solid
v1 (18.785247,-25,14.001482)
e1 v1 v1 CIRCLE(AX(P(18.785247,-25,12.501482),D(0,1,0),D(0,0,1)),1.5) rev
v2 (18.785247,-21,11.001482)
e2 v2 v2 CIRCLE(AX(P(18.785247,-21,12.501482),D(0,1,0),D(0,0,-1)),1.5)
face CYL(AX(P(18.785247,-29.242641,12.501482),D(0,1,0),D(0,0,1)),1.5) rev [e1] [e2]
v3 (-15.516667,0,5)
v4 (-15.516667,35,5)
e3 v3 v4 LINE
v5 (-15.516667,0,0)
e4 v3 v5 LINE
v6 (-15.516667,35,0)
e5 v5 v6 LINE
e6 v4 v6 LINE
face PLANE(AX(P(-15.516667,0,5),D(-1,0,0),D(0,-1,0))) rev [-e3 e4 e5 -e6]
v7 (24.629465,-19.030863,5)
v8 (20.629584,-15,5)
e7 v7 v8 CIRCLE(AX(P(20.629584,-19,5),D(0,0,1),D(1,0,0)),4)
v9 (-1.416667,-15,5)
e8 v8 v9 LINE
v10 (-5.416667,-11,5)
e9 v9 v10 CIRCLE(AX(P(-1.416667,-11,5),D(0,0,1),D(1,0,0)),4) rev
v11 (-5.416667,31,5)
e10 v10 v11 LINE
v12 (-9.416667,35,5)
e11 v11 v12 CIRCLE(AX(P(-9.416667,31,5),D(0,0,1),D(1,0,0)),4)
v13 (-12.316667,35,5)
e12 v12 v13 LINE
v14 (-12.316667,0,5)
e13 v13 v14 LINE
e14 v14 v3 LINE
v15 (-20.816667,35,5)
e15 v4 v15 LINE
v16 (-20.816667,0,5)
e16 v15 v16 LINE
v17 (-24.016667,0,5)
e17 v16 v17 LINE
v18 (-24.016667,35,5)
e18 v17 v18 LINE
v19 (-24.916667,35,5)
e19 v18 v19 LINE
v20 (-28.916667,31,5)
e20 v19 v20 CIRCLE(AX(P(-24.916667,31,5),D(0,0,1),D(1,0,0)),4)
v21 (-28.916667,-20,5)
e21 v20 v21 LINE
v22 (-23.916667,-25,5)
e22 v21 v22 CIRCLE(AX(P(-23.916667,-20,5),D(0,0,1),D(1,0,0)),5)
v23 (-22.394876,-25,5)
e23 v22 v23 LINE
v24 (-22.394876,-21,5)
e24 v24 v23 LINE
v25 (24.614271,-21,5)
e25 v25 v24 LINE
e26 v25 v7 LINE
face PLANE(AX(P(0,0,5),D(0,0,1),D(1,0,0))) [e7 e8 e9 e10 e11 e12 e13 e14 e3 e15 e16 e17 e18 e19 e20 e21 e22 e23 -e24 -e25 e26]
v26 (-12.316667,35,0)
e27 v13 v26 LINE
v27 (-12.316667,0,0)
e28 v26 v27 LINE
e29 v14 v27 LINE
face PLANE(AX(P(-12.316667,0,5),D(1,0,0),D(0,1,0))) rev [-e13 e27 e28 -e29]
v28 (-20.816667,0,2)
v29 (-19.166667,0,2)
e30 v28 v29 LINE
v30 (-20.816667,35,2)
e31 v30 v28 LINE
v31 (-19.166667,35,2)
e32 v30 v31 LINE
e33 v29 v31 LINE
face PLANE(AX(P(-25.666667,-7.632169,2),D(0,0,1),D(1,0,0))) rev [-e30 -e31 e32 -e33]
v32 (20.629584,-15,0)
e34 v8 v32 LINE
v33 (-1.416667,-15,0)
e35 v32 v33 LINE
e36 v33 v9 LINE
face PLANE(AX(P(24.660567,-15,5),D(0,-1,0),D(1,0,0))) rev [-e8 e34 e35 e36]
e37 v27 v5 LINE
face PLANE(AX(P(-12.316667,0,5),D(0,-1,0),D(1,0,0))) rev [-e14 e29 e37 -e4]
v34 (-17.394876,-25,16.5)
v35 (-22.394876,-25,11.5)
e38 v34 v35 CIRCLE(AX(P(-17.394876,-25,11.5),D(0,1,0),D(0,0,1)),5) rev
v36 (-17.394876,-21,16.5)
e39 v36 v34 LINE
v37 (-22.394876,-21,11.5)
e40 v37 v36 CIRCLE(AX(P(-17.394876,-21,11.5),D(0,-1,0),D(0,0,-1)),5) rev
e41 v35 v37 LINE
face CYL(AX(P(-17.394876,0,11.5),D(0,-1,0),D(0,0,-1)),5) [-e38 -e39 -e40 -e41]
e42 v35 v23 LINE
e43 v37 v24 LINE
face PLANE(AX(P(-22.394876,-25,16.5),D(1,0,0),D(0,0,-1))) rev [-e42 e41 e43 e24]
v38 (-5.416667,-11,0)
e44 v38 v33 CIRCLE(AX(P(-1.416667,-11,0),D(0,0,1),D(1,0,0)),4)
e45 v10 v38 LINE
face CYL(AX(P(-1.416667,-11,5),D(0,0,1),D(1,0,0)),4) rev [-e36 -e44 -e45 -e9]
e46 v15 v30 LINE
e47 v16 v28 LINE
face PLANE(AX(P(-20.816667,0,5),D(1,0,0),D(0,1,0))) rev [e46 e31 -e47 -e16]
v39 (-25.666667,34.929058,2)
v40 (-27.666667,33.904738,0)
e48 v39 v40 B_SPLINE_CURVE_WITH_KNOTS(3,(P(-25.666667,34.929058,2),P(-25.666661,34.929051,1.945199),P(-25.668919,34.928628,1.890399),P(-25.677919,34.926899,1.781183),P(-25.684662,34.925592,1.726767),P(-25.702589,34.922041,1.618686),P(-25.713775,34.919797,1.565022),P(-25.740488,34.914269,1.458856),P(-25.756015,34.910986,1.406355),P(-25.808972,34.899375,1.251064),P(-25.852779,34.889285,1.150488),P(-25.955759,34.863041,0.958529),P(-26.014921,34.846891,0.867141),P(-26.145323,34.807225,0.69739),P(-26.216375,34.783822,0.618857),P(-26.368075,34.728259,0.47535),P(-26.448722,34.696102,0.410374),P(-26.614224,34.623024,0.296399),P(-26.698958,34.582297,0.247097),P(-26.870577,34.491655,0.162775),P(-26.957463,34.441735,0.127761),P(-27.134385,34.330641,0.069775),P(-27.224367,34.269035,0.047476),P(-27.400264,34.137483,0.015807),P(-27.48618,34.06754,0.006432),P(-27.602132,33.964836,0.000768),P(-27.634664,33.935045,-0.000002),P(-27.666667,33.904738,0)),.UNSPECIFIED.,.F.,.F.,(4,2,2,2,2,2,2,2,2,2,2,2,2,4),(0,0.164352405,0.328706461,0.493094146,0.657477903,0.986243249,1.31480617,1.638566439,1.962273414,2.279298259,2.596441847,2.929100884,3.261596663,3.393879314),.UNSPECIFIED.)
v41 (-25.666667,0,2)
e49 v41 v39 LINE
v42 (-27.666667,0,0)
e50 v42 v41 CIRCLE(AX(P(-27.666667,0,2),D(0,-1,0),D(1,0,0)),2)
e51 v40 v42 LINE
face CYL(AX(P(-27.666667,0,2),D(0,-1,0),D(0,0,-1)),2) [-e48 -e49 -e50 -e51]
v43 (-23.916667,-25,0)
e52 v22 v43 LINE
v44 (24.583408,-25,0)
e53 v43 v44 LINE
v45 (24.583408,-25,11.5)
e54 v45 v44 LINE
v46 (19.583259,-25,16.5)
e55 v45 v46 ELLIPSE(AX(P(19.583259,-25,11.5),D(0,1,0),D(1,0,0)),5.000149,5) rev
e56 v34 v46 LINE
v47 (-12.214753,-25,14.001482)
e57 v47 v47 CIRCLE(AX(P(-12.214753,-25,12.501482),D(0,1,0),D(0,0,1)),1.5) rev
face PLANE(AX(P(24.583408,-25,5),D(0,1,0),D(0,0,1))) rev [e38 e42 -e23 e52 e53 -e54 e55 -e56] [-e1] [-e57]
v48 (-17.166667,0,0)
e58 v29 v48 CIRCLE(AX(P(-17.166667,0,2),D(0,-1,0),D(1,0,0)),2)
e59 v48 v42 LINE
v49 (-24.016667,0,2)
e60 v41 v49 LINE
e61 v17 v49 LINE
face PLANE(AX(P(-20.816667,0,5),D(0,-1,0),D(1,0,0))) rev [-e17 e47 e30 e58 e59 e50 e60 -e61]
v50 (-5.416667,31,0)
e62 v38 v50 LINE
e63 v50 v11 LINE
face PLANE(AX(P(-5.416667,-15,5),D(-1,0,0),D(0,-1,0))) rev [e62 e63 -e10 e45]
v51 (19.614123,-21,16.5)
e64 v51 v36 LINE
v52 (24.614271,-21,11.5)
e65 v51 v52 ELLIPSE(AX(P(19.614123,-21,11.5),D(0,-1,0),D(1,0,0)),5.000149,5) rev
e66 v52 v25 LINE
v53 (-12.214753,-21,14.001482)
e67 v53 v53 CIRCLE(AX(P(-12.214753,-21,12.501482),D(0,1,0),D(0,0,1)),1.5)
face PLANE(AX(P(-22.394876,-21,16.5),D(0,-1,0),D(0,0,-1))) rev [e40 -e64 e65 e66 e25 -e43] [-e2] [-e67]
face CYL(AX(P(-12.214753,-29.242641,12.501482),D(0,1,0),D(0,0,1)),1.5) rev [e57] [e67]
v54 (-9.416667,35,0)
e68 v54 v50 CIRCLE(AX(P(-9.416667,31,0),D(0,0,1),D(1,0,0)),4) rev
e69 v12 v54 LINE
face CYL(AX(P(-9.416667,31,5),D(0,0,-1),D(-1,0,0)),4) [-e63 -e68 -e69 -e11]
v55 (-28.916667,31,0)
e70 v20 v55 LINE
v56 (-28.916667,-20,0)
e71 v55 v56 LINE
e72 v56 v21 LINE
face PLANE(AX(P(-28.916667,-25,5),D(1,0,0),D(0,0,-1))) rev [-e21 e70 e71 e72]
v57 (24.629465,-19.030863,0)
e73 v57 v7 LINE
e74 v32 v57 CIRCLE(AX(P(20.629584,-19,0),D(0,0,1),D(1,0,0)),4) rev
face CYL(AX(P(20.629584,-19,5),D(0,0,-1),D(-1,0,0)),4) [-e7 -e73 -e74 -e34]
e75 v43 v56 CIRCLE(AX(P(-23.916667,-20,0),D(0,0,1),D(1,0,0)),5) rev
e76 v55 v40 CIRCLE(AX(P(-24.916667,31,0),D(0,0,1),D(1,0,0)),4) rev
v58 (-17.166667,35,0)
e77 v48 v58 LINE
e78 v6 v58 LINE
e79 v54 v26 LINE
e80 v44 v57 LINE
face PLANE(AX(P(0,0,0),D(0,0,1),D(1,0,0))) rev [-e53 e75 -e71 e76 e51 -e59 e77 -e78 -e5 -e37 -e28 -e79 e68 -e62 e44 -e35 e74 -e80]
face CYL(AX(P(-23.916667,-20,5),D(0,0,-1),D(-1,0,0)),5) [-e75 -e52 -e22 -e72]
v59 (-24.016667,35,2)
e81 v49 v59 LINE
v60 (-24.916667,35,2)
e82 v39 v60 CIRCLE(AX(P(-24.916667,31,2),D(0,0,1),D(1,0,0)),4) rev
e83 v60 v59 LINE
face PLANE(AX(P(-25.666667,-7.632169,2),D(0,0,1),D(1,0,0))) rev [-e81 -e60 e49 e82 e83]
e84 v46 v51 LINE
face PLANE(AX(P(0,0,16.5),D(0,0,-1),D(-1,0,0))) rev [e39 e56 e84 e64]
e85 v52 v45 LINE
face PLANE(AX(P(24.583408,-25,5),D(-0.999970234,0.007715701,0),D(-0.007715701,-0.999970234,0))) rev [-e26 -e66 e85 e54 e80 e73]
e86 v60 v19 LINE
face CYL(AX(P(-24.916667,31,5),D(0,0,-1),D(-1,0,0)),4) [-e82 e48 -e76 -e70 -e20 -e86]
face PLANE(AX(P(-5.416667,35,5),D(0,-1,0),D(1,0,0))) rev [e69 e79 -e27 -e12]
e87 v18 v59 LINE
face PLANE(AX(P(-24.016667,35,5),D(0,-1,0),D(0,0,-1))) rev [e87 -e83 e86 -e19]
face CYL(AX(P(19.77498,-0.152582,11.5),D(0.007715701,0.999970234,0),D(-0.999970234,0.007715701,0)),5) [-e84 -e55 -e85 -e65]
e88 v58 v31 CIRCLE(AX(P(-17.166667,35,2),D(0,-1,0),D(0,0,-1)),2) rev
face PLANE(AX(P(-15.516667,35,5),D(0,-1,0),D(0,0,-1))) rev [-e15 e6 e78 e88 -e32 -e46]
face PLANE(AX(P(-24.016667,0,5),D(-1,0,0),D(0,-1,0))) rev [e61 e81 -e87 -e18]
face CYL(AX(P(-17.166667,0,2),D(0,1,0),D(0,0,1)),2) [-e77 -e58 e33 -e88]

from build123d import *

# Parameters (mm, degrees)
EXTRUDE1_DEPTH = 5
EXTRUDE2_DEPTH = 11.5
SKETCH5_R      = 1.5
EXTRUDE3_DEPTH = 4
FILLET2_R      = 5
FILLET3_R      = 4
FILLET4_R      = 5
SKETCH4_W      = 6.5
SKETCH4_H      = 4
EXTRUDE4_DEPTH = 35
FILLET1_R      = 2


with BuildPart() as part:
    # Sketch1 → Extrude1 (new body)
    with BuildSketch(Plane.XY):
        Polygon((24.583407752, -25), (24.660567061, -15), (-5.416666667, -15), (-5.416666667, 35), (-12.316666667, 35), (-12.316666667, 0), (-15.516666667, 0), (-15.516666667, 35), (-20.816666667, 35), (-20.816666667, 0), (-24.016666667, 0), (-24.016666667, 35), (-28.916666667, 35), (-28.916666667, -25), align=None)
    extrude(amount=EXTRUDE1_DEPTH)

    # Sketch3 → Extrude2 (add)
    with BuildSketch(Plane.XY.offset(5)):
        Polygon((-22.394876452, -21), (24.614271475, -21), (24.583407752, -25), (-22.394876452, -25), align=None)
    extrude(amount=EXTRUDE2_DEPTH)

    # Sketch5 → Extrude3 (cut)
    with BuildSketch(Plane(origin=(0, -21, 0), x_dir=(1, 0, 0), z_dir=(0, 1, 0))):
        with Locations(Location((-12.214752954, -12.501481725, 0), (0, 0, 270))):
            Circle(SKETCH5_R)
        with Locations(Location((18.785247046, -12.501481725, 0), (0, 0, 270))):
            Circle(SKETCH5_R)
    extrude(amount=-EXTRUDE3_DEPTH, mode=Mode.SUBTRACT)

    # Fillet2
    fillet2_edges = [part.edges().sort_by_distance(p)[0] for p in [
        (-22.394876452, -23, 16.5),
        (24.598839614, -23, 16.5),
    ]]
    fillet(fillet2_edges, radius=FILLET2_R)

    # Fillet3
    fillet3_edges = [part.edges().sort_by_distance(p)[0] for p in [
        (-5.416666667, 35, 2.5),
        (-5.416666667, -15, 2.5),
        (24.660567061, -15, 2.5),
        (-28.916666667, 35, 2.5),
    ]]
    fillet(fillet3_edges, radius=FILLET3_R)

    # Fillet4
    fillet4_edges = [part.edges().sort_by_distance(p)[0] for p in [
        (-28.916666667, -25, 2.5),
    ]]
    fillet(fillet4_edges, radius=FILLET4_R)

    # Sketch4 → Extrude4 (cut)
    with BuildSketch(Plane(origin=(0, 35, 0), x_dir=(1, 0, 0), z_dir=(0, 1, 0))):
        with Locations((-22.416666667, 0)):
            Rectangle(SKETCH4_W, SKETCH4_H)
    extrude(amount=-EXTRUDE4_DEPTH, mode=Mode.SUBTRACT)

    # Fillet1
    fillet1_edges = [part.edges().sort_by_distance(p)[0] for p in [
        (-19.166666667, 17.5, 0),
        (-25.666666667, 17.464529206, 0),
    ]]
    fillet(fillet1_edges, radius=FILLET1_R - 0.0001)  # a hair under: the kernel refuses the full size


solid = part.part
